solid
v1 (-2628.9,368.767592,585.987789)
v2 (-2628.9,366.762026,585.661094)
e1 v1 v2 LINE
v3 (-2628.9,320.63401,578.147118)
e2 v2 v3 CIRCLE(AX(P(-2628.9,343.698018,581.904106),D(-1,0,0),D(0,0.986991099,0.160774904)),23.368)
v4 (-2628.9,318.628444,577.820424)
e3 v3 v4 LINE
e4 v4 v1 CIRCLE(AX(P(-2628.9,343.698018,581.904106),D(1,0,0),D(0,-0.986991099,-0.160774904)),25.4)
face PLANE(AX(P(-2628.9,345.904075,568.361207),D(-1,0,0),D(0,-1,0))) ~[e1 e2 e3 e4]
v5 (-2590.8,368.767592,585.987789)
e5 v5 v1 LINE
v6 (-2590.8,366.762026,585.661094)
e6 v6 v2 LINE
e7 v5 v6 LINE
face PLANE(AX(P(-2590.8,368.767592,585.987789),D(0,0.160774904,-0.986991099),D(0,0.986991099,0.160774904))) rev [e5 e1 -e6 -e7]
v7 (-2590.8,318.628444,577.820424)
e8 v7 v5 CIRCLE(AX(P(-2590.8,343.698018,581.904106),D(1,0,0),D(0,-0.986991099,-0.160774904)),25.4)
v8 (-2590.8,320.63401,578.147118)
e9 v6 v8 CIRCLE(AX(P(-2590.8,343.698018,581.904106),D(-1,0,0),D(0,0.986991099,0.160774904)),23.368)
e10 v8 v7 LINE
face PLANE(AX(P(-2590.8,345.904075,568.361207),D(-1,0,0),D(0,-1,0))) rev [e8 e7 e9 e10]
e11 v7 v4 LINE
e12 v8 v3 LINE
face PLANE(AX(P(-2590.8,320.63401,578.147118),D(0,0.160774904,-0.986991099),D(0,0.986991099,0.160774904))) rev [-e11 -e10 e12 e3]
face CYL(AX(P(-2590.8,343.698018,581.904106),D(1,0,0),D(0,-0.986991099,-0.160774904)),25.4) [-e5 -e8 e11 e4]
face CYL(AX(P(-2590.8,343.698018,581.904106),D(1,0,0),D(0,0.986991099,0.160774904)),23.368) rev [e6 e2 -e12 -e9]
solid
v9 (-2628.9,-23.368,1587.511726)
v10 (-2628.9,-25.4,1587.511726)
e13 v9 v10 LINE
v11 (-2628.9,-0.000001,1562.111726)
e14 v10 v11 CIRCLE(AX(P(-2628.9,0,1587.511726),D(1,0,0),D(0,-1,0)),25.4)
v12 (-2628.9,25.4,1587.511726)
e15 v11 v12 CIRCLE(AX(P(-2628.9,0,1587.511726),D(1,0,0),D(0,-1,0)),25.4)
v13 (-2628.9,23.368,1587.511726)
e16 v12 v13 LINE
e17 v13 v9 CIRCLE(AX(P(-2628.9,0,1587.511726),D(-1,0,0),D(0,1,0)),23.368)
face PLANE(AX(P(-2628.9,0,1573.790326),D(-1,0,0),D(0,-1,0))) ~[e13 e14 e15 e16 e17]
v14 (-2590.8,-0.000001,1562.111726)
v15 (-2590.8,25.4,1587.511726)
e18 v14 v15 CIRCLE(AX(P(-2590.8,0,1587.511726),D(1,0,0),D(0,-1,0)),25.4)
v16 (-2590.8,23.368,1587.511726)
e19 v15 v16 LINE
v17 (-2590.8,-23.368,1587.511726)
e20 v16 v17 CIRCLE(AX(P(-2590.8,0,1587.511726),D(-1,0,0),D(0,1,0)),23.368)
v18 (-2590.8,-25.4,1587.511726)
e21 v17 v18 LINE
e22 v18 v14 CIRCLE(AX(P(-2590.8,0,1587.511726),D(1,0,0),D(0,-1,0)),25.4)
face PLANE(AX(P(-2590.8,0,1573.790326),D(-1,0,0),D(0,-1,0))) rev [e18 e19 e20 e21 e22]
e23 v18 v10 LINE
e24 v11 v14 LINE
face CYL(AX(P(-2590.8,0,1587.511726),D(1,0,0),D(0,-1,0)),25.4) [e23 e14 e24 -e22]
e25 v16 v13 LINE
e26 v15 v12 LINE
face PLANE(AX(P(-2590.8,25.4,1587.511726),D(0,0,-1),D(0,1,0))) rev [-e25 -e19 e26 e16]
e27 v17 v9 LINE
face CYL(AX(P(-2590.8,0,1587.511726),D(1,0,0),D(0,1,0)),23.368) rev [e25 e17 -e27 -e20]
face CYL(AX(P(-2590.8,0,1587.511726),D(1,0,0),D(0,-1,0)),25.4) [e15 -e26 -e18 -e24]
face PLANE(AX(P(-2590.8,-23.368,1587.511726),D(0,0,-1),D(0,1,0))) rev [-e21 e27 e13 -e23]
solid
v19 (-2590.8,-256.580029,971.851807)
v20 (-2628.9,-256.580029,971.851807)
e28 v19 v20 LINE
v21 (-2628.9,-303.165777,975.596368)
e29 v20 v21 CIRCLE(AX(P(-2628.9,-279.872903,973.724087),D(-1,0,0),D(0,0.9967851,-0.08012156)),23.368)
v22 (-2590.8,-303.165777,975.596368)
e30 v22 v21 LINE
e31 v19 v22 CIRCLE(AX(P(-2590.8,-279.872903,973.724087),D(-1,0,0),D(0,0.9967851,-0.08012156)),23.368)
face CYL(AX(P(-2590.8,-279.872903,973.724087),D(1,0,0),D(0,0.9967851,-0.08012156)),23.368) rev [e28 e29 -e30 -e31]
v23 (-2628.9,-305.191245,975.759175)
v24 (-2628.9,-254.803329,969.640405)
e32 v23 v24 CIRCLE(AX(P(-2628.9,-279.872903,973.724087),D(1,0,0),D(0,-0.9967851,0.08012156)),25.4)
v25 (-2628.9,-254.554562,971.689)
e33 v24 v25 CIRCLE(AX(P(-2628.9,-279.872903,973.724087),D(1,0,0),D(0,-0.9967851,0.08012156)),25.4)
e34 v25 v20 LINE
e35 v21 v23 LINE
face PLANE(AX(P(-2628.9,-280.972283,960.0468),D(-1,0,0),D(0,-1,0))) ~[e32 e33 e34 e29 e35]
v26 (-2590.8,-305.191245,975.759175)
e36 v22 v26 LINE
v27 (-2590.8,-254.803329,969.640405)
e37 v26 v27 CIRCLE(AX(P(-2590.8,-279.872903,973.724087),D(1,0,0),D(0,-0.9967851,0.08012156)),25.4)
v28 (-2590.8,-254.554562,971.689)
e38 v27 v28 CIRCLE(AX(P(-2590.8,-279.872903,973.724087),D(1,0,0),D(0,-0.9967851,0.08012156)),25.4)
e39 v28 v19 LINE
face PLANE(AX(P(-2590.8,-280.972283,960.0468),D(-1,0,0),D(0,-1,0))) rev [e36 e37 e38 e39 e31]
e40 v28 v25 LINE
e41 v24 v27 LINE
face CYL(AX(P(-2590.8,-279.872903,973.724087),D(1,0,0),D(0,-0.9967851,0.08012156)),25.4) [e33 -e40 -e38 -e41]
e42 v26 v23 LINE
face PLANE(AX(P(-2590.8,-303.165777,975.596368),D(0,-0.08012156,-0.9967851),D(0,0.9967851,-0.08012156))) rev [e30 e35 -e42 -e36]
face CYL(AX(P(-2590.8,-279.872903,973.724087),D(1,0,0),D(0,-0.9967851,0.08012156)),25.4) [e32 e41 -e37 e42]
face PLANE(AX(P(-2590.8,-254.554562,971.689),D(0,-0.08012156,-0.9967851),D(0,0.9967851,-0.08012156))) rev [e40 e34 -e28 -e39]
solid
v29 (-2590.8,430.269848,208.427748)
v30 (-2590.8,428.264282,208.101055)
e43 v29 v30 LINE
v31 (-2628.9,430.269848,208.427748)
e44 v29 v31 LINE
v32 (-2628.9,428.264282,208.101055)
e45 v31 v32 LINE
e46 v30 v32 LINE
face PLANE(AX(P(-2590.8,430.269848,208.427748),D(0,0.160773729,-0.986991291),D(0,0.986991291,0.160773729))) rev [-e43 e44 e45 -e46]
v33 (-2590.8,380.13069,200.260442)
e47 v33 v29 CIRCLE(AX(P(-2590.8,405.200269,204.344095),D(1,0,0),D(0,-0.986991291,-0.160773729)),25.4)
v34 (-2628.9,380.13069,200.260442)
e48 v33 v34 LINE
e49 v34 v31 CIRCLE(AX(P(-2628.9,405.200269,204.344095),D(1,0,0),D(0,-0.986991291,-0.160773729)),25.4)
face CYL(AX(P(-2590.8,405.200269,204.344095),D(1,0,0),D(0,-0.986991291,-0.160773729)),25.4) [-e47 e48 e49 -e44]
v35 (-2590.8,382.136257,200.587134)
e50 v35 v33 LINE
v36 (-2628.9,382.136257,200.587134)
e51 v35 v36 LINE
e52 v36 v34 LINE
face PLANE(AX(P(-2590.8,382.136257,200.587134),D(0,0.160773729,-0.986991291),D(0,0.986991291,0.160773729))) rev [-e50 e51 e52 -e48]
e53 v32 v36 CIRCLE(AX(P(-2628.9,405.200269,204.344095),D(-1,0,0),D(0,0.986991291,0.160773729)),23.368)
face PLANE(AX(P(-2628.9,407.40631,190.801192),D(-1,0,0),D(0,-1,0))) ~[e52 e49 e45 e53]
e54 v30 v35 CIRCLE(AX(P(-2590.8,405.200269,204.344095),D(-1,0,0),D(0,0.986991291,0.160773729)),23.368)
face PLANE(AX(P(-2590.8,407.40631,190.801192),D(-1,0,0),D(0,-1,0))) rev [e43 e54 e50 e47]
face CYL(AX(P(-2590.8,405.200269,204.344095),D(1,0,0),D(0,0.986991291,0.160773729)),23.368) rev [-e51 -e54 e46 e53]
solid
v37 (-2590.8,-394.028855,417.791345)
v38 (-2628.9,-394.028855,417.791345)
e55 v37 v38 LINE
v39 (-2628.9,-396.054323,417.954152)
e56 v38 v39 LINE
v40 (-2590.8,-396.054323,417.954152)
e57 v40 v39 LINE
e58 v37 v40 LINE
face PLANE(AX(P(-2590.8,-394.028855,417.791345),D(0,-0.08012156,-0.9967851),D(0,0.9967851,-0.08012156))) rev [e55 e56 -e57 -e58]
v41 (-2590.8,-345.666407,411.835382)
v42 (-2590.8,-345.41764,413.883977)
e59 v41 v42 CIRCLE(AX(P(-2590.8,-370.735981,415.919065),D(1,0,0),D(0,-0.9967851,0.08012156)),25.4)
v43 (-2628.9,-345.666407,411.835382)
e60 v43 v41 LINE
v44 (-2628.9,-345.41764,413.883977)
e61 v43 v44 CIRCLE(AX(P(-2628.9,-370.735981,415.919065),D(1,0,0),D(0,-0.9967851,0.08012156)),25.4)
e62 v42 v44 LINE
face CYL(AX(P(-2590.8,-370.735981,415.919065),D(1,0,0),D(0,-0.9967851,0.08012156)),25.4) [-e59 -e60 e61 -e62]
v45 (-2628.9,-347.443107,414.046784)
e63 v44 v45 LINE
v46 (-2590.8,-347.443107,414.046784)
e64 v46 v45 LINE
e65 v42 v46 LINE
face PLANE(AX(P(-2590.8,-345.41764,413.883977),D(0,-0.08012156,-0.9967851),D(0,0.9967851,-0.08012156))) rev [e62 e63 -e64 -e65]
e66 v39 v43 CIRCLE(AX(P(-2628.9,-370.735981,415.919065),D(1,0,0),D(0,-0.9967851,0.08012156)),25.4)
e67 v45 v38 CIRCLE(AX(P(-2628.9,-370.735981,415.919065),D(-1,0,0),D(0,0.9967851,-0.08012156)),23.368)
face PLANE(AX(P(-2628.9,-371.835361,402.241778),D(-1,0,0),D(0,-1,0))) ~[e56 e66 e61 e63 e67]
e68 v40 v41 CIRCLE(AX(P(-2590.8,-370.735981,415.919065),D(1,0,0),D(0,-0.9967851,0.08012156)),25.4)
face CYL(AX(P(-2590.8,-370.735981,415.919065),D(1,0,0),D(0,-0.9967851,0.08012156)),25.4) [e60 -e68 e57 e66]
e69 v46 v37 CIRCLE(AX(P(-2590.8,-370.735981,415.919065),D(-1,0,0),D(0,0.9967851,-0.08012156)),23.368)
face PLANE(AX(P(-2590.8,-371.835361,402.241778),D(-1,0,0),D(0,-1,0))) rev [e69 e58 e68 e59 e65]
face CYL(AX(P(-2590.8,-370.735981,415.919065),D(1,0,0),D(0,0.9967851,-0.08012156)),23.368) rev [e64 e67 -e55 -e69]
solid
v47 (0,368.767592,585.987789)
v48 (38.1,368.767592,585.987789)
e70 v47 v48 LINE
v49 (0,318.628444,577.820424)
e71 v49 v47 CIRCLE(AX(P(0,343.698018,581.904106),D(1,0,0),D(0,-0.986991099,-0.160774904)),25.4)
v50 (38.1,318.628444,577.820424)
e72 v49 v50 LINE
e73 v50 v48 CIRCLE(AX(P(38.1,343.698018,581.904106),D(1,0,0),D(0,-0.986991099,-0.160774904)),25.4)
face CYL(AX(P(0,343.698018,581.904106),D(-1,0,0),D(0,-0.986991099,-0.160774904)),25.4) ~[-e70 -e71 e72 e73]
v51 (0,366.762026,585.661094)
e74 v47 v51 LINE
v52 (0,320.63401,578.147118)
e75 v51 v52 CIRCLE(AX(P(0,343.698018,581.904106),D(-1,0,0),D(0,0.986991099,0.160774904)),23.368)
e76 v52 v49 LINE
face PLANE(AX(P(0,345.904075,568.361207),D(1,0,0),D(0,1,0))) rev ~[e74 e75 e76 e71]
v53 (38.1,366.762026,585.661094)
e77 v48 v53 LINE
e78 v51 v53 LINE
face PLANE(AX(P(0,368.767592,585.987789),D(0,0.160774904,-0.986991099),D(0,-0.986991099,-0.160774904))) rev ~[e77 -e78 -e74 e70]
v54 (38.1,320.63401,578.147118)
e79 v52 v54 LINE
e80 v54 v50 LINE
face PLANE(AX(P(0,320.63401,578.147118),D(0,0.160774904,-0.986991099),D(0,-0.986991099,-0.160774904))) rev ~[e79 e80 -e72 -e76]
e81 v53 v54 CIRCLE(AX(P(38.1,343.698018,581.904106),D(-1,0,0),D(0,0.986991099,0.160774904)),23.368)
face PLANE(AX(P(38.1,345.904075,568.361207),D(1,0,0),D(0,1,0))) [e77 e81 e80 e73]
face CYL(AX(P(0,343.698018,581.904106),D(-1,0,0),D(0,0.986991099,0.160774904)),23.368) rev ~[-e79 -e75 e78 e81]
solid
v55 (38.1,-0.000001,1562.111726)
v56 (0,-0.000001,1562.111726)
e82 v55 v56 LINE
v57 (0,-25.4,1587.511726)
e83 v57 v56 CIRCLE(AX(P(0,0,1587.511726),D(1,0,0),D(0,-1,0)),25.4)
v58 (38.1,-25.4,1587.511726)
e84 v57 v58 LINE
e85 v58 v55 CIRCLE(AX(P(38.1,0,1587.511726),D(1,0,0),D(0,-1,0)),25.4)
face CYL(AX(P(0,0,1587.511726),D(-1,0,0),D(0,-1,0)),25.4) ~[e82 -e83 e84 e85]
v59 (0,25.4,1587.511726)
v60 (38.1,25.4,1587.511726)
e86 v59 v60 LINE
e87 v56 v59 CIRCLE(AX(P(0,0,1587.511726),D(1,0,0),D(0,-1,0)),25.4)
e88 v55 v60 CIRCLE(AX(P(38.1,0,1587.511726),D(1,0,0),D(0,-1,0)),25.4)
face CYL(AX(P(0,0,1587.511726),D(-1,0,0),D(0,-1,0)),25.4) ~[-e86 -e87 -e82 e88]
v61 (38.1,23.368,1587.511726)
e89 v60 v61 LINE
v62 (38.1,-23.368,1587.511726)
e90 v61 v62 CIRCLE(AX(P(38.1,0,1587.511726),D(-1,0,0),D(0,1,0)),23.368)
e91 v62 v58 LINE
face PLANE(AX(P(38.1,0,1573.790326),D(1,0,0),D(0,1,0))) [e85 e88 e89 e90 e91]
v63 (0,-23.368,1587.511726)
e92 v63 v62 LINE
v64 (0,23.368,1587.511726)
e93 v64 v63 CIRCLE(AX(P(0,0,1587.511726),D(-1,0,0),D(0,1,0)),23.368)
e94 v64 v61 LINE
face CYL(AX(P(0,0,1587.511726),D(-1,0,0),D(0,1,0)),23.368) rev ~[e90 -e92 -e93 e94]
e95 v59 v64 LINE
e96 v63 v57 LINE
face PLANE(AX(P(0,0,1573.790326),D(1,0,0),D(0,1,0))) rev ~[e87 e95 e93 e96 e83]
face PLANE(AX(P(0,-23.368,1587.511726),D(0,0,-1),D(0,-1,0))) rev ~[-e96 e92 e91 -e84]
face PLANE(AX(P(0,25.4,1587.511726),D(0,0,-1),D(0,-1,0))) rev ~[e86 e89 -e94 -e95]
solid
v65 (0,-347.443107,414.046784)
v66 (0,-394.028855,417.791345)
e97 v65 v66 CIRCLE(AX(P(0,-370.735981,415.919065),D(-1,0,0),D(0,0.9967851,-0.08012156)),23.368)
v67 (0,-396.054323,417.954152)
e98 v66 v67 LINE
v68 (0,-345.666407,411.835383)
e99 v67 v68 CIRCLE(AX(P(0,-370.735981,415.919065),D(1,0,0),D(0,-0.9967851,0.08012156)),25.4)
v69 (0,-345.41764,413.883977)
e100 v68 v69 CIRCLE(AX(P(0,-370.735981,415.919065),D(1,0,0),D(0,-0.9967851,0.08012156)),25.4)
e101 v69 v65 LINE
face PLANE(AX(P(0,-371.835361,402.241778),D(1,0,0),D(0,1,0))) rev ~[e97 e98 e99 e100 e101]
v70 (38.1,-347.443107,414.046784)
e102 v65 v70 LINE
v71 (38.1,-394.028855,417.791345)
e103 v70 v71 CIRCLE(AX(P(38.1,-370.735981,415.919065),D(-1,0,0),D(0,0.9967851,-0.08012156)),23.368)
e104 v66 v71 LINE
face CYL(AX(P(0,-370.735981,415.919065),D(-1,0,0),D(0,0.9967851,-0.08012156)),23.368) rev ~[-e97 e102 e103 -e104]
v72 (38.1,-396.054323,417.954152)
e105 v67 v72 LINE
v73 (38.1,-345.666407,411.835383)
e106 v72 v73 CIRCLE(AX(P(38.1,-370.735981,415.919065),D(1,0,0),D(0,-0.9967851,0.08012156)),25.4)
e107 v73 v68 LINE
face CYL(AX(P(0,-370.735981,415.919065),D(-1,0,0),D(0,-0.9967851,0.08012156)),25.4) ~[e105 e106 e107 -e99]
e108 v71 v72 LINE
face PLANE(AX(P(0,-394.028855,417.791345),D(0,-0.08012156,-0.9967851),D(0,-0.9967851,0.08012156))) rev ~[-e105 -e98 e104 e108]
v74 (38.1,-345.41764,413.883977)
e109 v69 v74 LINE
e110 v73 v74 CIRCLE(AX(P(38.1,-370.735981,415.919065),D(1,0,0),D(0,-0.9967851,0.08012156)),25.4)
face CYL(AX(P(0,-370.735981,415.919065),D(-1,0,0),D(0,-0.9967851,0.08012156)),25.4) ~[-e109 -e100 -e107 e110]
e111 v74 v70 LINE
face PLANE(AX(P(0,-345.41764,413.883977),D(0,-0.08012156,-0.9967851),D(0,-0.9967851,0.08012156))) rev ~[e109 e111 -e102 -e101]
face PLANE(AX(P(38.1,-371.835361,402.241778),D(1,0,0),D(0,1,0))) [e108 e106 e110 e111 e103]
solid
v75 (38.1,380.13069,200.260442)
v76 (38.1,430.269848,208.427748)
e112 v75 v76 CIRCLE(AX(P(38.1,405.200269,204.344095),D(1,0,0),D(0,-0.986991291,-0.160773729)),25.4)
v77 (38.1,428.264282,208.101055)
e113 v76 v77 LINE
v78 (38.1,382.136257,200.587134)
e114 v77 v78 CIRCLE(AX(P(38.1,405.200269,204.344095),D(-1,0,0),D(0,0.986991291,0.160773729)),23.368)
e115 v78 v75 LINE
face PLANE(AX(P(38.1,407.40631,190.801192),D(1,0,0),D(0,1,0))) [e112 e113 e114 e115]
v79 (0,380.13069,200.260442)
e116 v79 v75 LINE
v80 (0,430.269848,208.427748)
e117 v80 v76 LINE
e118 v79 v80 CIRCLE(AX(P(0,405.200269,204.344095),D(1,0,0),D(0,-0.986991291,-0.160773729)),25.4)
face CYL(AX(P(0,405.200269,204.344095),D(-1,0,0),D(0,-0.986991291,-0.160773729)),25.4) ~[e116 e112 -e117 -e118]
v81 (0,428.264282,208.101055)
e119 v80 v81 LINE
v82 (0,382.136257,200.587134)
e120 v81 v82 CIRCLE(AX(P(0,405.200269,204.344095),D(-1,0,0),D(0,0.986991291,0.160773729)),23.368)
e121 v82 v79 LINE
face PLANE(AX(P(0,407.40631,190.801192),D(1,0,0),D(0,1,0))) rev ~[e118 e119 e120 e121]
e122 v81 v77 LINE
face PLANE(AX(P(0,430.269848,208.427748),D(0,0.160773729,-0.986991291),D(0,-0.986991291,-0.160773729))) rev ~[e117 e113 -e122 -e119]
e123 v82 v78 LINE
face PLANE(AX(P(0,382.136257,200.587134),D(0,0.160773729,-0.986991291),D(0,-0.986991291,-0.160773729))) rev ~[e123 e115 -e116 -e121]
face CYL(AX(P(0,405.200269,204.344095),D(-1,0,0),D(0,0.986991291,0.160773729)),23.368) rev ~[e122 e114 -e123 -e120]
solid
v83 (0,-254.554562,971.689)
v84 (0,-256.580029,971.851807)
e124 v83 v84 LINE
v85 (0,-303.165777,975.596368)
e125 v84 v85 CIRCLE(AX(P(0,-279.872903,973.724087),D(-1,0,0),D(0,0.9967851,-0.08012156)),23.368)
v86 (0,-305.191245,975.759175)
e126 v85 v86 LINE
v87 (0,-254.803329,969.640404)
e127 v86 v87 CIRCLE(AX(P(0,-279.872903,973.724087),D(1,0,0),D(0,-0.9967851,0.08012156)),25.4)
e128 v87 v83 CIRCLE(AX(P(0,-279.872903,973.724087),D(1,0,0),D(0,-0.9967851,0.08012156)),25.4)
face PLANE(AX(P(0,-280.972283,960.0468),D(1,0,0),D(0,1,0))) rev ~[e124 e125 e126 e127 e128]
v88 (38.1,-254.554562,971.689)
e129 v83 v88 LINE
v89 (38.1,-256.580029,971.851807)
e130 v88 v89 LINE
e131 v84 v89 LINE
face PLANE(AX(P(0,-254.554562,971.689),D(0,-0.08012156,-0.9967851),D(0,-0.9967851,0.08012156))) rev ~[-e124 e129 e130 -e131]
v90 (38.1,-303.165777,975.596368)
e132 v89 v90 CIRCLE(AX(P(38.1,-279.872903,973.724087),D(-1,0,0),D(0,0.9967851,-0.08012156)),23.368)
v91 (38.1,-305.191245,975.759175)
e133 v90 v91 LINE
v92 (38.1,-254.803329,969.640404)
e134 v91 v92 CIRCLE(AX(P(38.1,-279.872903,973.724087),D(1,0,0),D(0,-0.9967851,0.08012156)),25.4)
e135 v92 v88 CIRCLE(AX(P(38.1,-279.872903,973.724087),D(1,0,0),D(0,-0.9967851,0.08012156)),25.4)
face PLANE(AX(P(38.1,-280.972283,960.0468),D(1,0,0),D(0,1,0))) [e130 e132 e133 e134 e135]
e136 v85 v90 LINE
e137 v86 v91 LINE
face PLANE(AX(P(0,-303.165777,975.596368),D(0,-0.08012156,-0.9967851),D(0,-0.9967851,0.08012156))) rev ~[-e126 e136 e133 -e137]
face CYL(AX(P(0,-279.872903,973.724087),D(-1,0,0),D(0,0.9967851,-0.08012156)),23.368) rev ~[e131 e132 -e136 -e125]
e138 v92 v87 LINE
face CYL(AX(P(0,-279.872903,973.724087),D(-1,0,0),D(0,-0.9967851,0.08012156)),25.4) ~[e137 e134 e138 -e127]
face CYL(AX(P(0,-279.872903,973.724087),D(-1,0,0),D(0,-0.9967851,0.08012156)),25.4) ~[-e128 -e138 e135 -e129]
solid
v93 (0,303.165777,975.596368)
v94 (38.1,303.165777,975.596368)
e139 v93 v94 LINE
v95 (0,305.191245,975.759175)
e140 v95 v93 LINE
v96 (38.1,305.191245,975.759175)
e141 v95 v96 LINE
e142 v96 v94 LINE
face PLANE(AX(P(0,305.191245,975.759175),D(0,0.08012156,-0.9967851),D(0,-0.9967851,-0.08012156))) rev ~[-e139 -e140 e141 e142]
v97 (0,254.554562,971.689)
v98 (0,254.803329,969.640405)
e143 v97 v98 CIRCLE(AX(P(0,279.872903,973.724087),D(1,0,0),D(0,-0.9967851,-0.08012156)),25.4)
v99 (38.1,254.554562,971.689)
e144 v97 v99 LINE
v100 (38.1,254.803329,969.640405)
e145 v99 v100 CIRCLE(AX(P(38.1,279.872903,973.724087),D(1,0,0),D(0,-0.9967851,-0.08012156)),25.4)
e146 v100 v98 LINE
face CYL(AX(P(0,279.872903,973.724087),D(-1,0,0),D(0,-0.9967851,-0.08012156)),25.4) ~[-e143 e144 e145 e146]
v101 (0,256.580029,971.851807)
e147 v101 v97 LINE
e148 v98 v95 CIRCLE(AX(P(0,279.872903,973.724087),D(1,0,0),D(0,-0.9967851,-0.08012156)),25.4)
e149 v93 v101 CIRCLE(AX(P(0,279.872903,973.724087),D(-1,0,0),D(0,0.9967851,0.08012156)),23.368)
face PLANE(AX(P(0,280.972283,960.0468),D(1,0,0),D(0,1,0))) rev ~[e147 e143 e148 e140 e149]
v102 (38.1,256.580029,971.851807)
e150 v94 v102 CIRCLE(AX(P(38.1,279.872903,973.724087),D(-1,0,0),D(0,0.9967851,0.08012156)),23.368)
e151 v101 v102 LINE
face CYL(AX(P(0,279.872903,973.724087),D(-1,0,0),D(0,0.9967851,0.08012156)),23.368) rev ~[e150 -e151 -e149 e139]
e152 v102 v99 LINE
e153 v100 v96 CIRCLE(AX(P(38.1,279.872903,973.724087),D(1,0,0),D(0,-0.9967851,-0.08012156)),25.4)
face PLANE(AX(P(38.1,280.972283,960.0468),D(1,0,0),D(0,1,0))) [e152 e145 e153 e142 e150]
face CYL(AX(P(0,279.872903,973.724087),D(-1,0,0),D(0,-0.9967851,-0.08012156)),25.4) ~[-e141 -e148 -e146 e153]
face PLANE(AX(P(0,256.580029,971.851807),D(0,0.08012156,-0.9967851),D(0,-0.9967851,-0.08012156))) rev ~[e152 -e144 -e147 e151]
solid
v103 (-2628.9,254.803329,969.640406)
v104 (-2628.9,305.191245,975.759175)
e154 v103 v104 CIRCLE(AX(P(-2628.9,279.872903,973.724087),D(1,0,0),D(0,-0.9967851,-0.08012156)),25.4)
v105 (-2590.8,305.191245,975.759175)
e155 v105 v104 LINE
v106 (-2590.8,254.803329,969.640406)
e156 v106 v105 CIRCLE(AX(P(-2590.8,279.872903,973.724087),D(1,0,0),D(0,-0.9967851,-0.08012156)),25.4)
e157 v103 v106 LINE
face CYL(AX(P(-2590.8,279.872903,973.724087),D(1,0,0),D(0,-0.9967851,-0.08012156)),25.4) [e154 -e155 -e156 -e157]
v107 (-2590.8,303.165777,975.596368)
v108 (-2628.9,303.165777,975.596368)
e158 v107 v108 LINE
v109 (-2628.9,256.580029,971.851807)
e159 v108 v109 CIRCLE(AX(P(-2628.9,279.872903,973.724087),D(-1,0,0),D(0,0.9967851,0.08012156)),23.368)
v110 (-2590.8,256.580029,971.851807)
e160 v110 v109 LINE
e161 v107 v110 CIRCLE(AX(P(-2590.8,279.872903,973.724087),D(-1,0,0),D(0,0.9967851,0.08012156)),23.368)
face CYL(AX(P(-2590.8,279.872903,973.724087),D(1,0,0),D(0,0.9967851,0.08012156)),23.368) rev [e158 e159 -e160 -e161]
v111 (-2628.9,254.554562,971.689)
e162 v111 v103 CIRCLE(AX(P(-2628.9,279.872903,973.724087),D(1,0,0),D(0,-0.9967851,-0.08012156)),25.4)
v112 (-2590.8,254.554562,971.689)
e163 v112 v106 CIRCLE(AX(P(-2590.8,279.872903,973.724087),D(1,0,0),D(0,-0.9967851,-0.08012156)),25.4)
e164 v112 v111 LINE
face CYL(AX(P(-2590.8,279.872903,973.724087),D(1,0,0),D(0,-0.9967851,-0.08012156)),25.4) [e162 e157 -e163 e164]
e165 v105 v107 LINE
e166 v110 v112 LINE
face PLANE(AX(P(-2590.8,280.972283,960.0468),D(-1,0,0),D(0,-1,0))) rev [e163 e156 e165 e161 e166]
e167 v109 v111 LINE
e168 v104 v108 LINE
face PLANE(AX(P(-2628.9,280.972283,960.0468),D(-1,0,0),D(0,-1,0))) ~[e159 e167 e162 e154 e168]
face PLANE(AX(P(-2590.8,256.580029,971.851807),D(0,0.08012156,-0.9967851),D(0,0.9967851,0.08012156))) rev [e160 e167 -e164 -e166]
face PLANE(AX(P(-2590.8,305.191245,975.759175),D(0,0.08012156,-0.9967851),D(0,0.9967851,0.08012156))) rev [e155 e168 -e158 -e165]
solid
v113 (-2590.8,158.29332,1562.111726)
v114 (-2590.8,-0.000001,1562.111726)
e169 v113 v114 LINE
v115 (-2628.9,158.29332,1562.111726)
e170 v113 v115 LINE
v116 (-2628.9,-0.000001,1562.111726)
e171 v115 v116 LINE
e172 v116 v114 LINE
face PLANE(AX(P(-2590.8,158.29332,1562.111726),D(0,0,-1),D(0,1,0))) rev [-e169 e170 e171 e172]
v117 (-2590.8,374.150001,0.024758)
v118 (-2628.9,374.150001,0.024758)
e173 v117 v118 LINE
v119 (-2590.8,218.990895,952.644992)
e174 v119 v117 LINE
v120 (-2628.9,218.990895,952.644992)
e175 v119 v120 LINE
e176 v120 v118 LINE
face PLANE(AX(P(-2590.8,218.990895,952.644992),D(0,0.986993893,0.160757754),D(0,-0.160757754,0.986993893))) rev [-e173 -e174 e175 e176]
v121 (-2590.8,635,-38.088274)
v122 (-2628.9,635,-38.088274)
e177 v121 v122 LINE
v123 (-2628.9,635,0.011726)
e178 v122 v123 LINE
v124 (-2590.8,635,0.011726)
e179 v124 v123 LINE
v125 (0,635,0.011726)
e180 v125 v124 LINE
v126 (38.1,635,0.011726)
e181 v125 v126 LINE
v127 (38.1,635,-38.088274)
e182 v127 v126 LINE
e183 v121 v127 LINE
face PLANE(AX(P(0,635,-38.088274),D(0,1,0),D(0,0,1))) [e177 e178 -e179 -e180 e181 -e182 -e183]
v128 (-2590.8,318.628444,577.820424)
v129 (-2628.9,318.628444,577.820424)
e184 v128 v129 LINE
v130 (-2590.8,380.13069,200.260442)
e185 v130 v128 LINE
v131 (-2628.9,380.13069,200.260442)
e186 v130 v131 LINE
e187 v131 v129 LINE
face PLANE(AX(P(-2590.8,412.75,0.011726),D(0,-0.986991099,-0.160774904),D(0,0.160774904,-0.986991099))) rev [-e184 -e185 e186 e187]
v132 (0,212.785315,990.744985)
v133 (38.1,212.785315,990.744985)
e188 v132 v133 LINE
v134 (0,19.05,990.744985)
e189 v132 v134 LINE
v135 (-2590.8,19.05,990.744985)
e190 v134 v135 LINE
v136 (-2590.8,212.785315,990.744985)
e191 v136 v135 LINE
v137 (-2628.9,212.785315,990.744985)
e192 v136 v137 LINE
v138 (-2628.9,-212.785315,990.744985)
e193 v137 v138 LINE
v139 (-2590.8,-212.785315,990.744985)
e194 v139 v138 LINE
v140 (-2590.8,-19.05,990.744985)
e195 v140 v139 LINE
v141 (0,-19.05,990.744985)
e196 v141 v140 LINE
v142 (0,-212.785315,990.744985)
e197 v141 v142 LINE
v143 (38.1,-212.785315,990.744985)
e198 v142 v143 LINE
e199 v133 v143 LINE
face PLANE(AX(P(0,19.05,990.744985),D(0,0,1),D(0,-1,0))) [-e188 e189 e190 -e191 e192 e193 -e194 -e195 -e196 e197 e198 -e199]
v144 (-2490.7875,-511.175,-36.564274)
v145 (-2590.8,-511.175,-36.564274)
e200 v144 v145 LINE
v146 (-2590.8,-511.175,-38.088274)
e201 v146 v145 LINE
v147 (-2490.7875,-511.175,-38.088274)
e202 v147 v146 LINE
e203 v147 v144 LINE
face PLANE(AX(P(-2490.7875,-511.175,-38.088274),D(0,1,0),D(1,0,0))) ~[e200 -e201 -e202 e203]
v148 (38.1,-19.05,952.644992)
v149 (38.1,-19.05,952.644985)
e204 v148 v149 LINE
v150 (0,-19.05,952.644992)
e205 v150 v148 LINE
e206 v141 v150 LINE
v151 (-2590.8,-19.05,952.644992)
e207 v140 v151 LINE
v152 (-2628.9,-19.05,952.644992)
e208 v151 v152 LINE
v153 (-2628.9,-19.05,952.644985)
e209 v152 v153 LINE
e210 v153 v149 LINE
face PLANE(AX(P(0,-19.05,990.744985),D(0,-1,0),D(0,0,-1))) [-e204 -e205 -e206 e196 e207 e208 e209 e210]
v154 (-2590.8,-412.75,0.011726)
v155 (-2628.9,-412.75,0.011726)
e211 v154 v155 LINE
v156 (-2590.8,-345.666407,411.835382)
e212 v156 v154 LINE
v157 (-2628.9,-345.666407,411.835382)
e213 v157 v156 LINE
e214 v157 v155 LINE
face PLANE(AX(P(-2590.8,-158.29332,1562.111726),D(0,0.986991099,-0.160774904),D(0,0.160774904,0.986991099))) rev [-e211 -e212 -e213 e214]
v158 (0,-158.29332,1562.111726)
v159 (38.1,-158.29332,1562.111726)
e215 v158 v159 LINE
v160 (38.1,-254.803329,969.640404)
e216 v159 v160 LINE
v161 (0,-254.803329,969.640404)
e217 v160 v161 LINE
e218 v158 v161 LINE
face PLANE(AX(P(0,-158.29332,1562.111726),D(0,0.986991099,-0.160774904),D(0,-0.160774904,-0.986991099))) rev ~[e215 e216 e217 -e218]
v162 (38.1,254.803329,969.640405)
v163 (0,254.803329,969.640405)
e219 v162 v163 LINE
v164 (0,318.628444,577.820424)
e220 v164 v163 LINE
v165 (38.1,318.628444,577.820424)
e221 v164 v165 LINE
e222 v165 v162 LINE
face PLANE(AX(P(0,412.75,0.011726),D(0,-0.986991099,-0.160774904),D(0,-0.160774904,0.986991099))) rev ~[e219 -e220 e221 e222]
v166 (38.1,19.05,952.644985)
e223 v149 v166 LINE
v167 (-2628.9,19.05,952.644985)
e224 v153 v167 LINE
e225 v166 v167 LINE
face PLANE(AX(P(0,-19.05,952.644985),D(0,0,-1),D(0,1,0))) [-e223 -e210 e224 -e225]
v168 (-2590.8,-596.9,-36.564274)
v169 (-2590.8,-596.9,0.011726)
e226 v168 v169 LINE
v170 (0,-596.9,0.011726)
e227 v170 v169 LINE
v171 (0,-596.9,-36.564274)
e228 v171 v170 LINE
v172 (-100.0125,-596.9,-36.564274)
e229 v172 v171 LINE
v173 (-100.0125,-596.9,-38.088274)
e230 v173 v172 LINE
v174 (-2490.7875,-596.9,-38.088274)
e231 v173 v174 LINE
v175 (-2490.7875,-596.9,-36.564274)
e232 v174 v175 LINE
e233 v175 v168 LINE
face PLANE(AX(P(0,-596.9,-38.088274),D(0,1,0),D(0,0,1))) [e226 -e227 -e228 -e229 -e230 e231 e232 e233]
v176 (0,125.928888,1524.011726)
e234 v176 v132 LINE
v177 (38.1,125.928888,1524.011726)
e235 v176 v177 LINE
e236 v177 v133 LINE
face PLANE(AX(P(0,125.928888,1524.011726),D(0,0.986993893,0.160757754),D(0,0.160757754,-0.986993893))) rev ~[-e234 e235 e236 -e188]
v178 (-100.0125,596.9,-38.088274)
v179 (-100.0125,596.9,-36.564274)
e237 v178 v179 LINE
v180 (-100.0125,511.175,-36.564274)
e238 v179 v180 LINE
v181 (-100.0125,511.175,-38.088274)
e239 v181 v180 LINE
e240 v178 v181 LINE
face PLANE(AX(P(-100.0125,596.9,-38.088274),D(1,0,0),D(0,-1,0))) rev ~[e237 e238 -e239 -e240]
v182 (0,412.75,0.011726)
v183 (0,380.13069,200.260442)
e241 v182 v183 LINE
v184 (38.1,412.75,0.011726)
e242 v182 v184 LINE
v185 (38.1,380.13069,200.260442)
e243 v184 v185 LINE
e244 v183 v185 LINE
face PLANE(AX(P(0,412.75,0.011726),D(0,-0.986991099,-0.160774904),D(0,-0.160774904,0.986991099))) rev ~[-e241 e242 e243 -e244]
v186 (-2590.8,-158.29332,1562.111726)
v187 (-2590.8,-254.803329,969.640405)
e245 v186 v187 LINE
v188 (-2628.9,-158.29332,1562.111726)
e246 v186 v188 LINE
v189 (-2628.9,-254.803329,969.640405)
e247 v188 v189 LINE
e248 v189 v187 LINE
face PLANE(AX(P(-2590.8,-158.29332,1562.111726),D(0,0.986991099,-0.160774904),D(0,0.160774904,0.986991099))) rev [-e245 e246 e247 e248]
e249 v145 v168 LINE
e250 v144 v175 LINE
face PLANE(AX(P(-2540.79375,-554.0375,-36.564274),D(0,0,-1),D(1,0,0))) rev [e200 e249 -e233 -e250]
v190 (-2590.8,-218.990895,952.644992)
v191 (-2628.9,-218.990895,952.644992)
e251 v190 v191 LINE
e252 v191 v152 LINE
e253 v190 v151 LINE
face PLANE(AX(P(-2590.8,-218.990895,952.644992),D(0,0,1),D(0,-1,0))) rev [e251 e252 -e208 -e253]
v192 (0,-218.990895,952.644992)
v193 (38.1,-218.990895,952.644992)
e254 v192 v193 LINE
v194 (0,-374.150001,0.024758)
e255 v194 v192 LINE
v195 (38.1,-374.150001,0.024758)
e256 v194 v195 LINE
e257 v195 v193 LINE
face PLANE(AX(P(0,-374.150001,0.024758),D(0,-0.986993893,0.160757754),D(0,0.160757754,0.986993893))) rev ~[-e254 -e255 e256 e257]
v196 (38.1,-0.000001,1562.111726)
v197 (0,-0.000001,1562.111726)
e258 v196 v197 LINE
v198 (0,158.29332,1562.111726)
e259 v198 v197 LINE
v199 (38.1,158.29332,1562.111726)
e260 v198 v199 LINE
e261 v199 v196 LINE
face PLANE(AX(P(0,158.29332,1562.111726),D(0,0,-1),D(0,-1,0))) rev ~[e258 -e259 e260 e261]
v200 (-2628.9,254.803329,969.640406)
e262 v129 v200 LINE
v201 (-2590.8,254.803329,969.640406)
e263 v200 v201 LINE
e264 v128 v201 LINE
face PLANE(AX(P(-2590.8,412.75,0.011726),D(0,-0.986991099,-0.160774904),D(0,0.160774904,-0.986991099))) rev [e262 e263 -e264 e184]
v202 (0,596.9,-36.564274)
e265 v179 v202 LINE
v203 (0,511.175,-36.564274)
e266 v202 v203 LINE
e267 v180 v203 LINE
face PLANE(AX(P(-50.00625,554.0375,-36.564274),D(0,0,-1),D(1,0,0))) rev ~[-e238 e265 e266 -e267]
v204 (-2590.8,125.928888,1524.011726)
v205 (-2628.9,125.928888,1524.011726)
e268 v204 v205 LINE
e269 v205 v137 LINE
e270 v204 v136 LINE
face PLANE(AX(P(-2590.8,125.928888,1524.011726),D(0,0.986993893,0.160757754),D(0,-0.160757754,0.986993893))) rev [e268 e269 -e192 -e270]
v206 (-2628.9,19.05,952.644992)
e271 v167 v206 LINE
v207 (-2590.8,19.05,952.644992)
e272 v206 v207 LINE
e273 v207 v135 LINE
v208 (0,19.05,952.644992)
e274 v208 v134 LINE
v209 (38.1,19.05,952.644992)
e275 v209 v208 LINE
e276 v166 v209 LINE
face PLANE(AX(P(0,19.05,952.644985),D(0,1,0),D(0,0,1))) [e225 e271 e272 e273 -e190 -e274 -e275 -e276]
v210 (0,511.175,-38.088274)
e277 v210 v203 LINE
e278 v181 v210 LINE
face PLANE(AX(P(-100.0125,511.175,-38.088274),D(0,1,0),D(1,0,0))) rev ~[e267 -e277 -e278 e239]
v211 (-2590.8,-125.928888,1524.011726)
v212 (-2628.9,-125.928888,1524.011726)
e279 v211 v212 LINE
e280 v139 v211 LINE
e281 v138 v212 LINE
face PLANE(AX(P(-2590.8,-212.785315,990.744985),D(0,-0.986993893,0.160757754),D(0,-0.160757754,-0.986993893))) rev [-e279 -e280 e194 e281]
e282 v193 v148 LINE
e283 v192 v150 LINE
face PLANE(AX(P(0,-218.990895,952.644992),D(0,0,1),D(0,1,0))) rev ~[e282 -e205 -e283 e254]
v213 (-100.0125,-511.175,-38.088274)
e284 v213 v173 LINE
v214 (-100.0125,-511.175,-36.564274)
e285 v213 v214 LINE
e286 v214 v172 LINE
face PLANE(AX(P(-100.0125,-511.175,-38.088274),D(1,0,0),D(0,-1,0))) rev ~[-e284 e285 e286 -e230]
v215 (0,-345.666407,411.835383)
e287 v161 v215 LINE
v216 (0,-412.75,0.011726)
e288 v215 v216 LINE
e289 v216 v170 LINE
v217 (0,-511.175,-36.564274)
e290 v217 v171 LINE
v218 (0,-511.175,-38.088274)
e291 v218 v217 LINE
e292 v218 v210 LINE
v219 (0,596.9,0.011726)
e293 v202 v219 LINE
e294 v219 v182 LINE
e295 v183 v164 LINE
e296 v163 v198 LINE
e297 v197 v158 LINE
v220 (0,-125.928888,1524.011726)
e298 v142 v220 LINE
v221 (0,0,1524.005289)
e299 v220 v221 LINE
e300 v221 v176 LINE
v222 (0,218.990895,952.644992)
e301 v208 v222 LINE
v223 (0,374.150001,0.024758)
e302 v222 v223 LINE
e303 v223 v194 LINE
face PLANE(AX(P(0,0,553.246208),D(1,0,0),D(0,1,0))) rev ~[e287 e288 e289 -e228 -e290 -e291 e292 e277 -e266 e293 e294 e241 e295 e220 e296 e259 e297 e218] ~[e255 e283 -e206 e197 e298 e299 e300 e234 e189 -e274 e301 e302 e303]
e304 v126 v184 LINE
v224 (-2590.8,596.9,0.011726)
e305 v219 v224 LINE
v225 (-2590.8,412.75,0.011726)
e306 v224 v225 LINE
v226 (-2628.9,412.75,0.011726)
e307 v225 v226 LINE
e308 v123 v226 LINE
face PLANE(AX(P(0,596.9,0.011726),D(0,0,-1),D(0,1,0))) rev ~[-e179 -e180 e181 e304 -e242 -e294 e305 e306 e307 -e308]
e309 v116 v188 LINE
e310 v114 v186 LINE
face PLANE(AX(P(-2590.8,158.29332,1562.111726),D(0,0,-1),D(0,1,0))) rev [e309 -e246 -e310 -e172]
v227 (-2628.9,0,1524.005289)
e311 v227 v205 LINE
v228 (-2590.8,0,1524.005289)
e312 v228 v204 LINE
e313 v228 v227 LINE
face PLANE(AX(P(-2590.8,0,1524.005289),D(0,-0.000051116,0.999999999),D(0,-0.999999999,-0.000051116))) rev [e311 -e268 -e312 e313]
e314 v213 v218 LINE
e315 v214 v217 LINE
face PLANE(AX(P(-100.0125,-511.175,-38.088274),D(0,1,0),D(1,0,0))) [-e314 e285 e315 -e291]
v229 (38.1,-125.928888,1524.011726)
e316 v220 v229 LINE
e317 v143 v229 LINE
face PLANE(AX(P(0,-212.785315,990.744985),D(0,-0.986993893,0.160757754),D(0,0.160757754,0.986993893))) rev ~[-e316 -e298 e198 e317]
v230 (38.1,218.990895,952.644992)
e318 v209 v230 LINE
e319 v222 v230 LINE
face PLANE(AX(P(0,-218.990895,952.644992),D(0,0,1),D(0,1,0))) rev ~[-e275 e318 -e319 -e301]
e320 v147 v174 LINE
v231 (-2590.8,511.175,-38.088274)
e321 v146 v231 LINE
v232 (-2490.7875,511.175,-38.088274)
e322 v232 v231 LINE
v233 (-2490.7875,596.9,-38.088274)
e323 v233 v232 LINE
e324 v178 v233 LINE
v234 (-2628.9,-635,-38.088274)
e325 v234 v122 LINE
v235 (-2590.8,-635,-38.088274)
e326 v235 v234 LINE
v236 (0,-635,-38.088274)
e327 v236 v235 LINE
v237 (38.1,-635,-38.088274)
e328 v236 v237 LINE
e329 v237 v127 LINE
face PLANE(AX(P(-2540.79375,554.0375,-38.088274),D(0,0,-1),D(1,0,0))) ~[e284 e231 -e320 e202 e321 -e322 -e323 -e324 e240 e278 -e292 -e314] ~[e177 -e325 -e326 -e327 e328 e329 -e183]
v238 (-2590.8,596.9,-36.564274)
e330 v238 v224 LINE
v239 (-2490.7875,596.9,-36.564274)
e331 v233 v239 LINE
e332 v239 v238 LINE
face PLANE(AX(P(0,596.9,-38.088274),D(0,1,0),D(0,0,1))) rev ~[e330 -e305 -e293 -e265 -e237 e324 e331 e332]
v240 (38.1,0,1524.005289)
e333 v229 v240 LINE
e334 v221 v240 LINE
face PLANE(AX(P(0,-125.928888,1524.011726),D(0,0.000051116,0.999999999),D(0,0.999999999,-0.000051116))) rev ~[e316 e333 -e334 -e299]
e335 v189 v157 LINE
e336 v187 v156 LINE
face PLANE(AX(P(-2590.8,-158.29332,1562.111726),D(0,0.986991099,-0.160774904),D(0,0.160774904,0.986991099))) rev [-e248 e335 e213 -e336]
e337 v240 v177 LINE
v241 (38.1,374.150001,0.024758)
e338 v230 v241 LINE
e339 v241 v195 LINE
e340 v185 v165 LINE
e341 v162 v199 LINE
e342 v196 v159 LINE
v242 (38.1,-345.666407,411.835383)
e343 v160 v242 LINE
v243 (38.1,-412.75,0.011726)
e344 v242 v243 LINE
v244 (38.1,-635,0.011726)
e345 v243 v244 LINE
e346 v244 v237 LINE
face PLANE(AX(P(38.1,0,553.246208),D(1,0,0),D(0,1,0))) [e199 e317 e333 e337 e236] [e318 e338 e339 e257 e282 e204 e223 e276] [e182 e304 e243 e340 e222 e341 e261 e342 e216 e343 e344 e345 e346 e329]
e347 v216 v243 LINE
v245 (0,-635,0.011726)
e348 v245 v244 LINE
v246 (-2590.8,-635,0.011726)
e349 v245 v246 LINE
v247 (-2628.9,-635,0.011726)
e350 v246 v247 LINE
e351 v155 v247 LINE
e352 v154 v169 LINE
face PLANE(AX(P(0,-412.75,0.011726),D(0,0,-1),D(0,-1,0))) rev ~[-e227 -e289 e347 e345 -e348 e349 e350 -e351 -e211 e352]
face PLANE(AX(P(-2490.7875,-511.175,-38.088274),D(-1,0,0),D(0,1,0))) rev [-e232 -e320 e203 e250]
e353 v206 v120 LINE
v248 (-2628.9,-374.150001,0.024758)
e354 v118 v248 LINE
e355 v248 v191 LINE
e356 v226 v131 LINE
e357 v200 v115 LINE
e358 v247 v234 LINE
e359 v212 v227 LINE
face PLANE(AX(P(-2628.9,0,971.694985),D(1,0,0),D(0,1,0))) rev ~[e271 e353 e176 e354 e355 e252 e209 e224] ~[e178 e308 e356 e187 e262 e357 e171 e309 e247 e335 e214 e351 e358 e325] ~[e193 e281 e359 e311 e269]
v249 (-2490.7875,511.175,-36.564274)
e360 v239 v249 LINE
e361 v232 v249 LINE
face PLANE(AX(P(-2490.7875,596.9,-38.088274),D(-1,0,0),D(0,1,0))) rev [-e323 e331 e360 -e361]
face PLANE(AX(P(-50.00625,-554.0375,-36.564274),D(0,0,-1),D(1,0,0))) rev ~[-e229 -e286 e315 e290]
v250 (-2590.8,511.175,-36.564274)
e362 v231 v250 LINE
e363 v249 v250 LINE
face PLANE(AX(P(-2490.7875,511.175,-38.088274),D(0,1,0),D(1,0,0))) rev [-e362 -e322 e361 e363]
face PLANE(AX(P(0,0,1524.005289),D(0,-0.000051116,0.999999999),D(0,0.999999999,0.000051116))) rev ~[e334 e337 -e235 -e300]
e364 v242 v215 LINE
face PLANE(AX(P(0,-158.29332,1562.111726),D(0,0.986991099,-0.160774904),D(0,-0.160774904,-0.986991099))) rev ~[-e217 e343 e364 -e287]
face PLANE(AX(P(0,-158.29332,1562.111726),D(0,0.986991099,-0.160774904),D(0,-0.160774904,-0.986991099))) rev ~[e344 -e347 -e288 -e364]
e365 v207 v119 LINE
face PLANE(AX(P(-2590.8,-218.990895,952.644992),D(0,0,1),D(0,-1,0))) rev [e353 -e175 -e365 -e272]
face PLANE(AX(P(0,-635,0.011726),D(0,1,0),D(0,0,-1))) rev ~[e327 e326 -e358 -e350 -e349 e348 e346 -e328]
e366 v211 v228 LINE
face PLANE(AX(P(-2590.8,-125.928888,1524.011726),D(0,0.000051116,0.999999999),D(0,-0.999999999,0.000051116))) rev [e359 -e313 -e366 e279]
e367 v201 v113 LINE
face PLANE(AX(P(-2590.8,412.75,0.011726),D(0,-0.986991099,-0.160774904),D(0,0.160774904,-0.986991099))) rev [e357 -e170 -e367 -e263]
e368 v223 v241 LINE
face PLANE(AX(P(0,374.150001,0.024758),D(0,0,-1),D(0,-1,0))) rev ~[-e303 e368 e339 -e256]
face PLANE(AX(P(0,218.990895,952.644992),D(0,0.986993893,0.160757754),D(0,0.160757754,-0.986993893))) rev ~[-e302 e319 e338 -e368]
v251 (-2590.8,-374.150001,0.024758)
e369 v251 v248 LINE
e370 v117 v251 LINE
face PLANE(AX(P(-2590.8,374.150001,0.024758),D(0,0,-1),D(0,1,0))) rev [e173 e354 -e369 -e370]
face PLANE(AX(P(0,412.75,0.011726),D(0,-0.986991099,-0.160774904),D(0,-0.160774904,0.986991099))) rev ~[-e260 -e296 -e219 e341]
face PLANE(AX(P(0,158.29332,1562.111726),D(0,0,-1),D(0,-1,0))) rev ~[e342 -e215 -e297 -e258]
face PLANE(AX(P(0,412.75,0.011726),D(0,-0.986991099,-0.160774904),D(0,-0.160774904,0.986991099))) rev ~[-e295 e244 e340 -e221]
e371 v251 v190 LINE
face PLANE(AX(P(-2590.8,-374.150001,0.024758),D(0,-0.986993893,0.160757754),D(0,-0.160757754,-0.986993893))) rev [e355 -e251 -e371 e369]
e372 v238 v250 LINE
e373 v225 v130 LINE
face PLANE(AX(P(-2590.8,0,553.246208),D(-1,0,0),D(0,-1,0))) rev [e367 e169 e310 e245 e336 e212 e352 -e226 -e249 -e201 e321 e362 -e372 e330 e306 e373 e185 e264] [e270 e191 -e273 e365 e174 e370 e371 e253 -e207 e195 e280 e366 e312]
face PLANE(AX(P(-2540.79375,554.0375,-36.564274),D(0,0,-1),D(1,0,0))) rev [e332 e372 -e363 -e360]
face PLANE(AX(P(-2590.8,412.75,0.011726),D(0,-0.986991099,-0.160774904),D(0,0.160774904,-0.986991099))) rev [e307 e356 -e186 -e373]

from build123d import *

# Parameters (mm, degrees)
F2_DEPTH  = 38.1
F5_DEPTH  = 38.1
F7_W      = 38.1000000541
F7_H      = 38.1
F8_DEPTH  = 2590.8
F10_DEPTH = 2628.9
F12_W     = 100.0124999999
F12_H     = 85.725
F13_DEPTH = 1.524


# Not quite as in the source:
# - an extrude ends at something that could not be found from the text; its depth is read off the source's solid
# - ends of sketch curves that miss each other by under 0.0002 mm in the source are joined


with BuildPart() as f2:
    # F1 (on Right) → F2 (new body)
    with BuildSketch(Plane.YZ):
        Polygon((634.9999999459, 0.0117264176), (412.7499999459, 0.0117264176), (158.2933200412, 1562.1117264176), (0, 1562.1117264176), (-158.2933200412, 1562.1117264176), (-412.7499999459, 0.0117264176), (-634.9999999459, 0.0117264176), (-634.9999999459, -38.0882735824), (5.41e-08, -38.0882735824), (634.9999999459, -38.0882735824), align=None)
        Polygon((218.9908951289, 952.644992336), (374.1500007125, 0.0247576549), (0, 0.0247576549), (-374.1500007125, 0.0247576549), (-218.9908951289, 952.644992336), (0, 952.644992336), align=None, mode=Mode.SUBTRACT)
        Polygon((125.9288876334, 1524.0117264176), (212.785315444, 990.7449849442), (0, 990.7449849442), (-212.785315444, 990.7449849442), (-125.9288876334, 1524.0117264176), (0, 1524.0052894621), align=None, mode=Mode.SUBTRACT)
    extrude(amount=F2_DEPTH)


with BuildPart() as f3_1:
    # F3: instance of F2
    add(f2.part.mirror(Plane.YZ.offset(-1295.4)))


with BuildPart() as f5:
    # F4 (on Right) → F5 (new body)
    with BuildSketch(Plane.YZ):
        with BuildLine():
            Line((256.5800290113, 971.8518066202), (254.554561688, 971.6889996104))
            ThreePointArc((254.554561688, 971.6889996104), (281.9079908515, 948.4057456927), (305.1912447692, 975.7591748562))
            Line((305.1912447692, 975.7591748562), (303.165777446, 975.5963678464))
            ThreePointArc((303.165777446, 975.5963678464), (281.7451838417, 950.4312130159), (256.5800290113, 971.8518066202))
        make_face()
    extrude(amount=F5_DEPTH)


with BuildPart() as f5b:
    # F4 (on Right) → F5, piece 2 (new body)
    with BuildSketch(Plane.YZ):
        with BuildLine():
            Line((430.2698480282, 208.4277475534), (428.2642817252, 208.1010553365))
            ThreePointArc((428.2642817252, 208.1010553365), (408.9572297354, 181.280082359), (382.1362567578, 200.5871343488))
            Line((382.1362567578, 200.5871343488), (380.1306904549, 200.260442132))
            ThreePointArc((380.1306904549, 200.260442132), (409.2839219522, 179.2745160561), (430.2698480282, 208.4277475534))
        make_face()
    extrude(amount=F5_DEPTH)


with BuildPart() as f5c:
    # F4 (on Right) → F5, piece 3 (new body)
    with BuildSketch(Plane.YZ):
        with BuildLine():
            Line((320.6340097877, 578.1471183433), (318.6284438739, 577.8204237375))
            ThreePointArc((318.6284438739, 577.8204237375), (347.7817003689, 556.8345323879), (368.7675917185, 585.987788883))
            Line((368.7675917185, 585.987788883), (366.7620258047, 585.6610942772))
            ThreePointArc((366.7620258047, 585.6610942772), (347.4550057631, 558.8400983017), (320.6340097877, 578.1471183433))
        make_face()
    extrude(amount=F5_DEPTH)


with BuildPart() as f5d:
    # F4 (on Right) → F5, piece 4 (new body)
    with BuildSketch(Plane.YZ):
        with BuildLine():
            ThreePointArc((-305.1912447692, 975.7591748562), (-281.9079908515, 948.4057456927), (-254.554561688, 971.6889996104))
            Line((-254.554561688, 971.6889996104), (-256.5800290113, 971.8518066202))
            ThreePointArc((-256.5800290113, 971.8518066202), (-281.7451838417, 950.4312130159), (-303.165777446, 975.5963678464))
            Line((-303.165777446, 975.5963678464), (-305.1912447692, 975.7591748562))
        make_face()
    extrude(amount=F5_DEPTH)


with BuildPart() as f5e:
    # F4 (on Right) → F5, piece 5 (new body)
    with BuildSketch(Plane.YZ):
        with BuildLine():
            ThreePointArc((-396.0543227014, 417.9541524412), (-372.7710687837, 390.6007232777), (-345.4176396202, 413.8839771954))
            Line((-345.4176396202, 413.8839771954), (-347.4431069434, 414.0467842053))
            ThreePointArc((-347.4431069434, 414.0467842053), (-372.6082617739, 392.626190601), (-394.0288553782, 417.7913454314))
            Line((-394.0288553782, 417.7913454314), (-396.0543227014, 417.9541524412))
        make_face()
    extrude(amount=F5_DEPTH)


with BuildPart() as f5f:
    # F4 (on Right) → F5, piece 6 (new body)
    with BuildSketch(Plane.YZ):
        with BuildLine():
            Line((-23.368, 1587.5117264176), (-25.4, 1587.5117264176))
            ThreePointArc((-25.4, 1587.5117264176), (0, 1562.1117264176), (25.4, 1587.5117264176))
            Line((25.4, 1587.5117264176), (23.368, 1587.5117264176))
            ThreePointArc((23.368, 1587.5117264176), (0, 1564.1437264176), (-23.368, 1587.5117264176))
        make_face()
    extrude(amount=F5_DEPTH)


with BuildPart() as f6_1:
    # F6: instance of F5d
    add(f5d.part.mirror(Plane.YZ.offset(-1295.4)))


with BuildPart() as f6_2:
    # F6: instance of F5e
    add(f5e.part.mirror(Plane.YZ.offset(-1295.4)))


with BuildPart() as f6_3:
    # F6: instance of F5f
    add(f5f.part.mirror(Plane.YZ.offset(-1295.4)))


with BuildPart() as f6_4:
    # F6: instance of F5
    add(f5.part.mirror(Plane.YZ.offset(-1295.4)))


with BuildPart() as f6_5:
    # F6: instance of F5c
    add(f5c.part.mirror(Plane.YZ.offset(-1295.4)))


with BuildPart() as f6_6:
    # F6: instance of F5b
    add(f5b.part.mirror(Plane.YZ.offset(-1295.4)))


with BuildPart() as f2_1:
    add(f2.part)

    add(f3_1.part)  # F8 merges F3_1
    # F7 (on Right) → F8 (join, through all)
    with BuildSketch(Plane.YZ):
        with Locations((615.9499999729, -19.0382735824)):
            Rectangle(F7_W, F7_H)
        with Locations((-615.9499999729, -19.0382735824)):
            Rectangle(F7_W, F7_H)
    extrude(amount=-F8_DEPTH)

    # F9 (on Right) → F10 (join, through all)
    with BuildSketch(Plane.YZ):
        Polygon((19.05, 990.7449849442), (0, 990.7449849442), (-19.05, 990.7449849442), (-19.05, 952.6449849442), (0, 952.6449849442), (19.05, 952.6449849442), align=None)
    extrude(amount=-F10_DEPTH)

    # F12 (on offset) → F13 (join)
    with BuildSketch(Plane(origin=(0, 0, -38.0882735824), x_dir=(1, 0, 0), z_dir=(0, 0, -1))):
        with Locations((-50.0062500002, -554.0374999459)):
            Rectangle(F12_W, F12_H)
        with Locations((-50.0062500001, 554.0374999459)):
            Rectangle(F12_W, F12_H)
    extrude(amount=-F13_DEPTH)



with BuildPart() as f2_2:
    add(f2_1.part)

    add(f5.part)  # F14 merges F5

    add(f5b.part)  # F14 merges F5b

    add(f5c.part)  # F14 merges F5c

    add(f5d.part)  # F14 merges F5d

    add(f5e.part)  # F14 merges F5e

    add(f5f.part)  # F14 merges F5f

    add(f6_1.part)  # F14 merges F6_1

    add(f6_2.part)  # F14 merges F6_2

    add(f6_3.part)  # F14 merges F6_3

    add(f6_4.part)  # F14 merges F6_4

    add(f6_5.part)  # F14 merges F6_5

    add(f6_6.part)  # F14 merges F6_6
    # F14: F2 across plane
    add(f2_1.part.mirror(Plane.YZ.offset(-1295.4)))


solid = f2_2.part
